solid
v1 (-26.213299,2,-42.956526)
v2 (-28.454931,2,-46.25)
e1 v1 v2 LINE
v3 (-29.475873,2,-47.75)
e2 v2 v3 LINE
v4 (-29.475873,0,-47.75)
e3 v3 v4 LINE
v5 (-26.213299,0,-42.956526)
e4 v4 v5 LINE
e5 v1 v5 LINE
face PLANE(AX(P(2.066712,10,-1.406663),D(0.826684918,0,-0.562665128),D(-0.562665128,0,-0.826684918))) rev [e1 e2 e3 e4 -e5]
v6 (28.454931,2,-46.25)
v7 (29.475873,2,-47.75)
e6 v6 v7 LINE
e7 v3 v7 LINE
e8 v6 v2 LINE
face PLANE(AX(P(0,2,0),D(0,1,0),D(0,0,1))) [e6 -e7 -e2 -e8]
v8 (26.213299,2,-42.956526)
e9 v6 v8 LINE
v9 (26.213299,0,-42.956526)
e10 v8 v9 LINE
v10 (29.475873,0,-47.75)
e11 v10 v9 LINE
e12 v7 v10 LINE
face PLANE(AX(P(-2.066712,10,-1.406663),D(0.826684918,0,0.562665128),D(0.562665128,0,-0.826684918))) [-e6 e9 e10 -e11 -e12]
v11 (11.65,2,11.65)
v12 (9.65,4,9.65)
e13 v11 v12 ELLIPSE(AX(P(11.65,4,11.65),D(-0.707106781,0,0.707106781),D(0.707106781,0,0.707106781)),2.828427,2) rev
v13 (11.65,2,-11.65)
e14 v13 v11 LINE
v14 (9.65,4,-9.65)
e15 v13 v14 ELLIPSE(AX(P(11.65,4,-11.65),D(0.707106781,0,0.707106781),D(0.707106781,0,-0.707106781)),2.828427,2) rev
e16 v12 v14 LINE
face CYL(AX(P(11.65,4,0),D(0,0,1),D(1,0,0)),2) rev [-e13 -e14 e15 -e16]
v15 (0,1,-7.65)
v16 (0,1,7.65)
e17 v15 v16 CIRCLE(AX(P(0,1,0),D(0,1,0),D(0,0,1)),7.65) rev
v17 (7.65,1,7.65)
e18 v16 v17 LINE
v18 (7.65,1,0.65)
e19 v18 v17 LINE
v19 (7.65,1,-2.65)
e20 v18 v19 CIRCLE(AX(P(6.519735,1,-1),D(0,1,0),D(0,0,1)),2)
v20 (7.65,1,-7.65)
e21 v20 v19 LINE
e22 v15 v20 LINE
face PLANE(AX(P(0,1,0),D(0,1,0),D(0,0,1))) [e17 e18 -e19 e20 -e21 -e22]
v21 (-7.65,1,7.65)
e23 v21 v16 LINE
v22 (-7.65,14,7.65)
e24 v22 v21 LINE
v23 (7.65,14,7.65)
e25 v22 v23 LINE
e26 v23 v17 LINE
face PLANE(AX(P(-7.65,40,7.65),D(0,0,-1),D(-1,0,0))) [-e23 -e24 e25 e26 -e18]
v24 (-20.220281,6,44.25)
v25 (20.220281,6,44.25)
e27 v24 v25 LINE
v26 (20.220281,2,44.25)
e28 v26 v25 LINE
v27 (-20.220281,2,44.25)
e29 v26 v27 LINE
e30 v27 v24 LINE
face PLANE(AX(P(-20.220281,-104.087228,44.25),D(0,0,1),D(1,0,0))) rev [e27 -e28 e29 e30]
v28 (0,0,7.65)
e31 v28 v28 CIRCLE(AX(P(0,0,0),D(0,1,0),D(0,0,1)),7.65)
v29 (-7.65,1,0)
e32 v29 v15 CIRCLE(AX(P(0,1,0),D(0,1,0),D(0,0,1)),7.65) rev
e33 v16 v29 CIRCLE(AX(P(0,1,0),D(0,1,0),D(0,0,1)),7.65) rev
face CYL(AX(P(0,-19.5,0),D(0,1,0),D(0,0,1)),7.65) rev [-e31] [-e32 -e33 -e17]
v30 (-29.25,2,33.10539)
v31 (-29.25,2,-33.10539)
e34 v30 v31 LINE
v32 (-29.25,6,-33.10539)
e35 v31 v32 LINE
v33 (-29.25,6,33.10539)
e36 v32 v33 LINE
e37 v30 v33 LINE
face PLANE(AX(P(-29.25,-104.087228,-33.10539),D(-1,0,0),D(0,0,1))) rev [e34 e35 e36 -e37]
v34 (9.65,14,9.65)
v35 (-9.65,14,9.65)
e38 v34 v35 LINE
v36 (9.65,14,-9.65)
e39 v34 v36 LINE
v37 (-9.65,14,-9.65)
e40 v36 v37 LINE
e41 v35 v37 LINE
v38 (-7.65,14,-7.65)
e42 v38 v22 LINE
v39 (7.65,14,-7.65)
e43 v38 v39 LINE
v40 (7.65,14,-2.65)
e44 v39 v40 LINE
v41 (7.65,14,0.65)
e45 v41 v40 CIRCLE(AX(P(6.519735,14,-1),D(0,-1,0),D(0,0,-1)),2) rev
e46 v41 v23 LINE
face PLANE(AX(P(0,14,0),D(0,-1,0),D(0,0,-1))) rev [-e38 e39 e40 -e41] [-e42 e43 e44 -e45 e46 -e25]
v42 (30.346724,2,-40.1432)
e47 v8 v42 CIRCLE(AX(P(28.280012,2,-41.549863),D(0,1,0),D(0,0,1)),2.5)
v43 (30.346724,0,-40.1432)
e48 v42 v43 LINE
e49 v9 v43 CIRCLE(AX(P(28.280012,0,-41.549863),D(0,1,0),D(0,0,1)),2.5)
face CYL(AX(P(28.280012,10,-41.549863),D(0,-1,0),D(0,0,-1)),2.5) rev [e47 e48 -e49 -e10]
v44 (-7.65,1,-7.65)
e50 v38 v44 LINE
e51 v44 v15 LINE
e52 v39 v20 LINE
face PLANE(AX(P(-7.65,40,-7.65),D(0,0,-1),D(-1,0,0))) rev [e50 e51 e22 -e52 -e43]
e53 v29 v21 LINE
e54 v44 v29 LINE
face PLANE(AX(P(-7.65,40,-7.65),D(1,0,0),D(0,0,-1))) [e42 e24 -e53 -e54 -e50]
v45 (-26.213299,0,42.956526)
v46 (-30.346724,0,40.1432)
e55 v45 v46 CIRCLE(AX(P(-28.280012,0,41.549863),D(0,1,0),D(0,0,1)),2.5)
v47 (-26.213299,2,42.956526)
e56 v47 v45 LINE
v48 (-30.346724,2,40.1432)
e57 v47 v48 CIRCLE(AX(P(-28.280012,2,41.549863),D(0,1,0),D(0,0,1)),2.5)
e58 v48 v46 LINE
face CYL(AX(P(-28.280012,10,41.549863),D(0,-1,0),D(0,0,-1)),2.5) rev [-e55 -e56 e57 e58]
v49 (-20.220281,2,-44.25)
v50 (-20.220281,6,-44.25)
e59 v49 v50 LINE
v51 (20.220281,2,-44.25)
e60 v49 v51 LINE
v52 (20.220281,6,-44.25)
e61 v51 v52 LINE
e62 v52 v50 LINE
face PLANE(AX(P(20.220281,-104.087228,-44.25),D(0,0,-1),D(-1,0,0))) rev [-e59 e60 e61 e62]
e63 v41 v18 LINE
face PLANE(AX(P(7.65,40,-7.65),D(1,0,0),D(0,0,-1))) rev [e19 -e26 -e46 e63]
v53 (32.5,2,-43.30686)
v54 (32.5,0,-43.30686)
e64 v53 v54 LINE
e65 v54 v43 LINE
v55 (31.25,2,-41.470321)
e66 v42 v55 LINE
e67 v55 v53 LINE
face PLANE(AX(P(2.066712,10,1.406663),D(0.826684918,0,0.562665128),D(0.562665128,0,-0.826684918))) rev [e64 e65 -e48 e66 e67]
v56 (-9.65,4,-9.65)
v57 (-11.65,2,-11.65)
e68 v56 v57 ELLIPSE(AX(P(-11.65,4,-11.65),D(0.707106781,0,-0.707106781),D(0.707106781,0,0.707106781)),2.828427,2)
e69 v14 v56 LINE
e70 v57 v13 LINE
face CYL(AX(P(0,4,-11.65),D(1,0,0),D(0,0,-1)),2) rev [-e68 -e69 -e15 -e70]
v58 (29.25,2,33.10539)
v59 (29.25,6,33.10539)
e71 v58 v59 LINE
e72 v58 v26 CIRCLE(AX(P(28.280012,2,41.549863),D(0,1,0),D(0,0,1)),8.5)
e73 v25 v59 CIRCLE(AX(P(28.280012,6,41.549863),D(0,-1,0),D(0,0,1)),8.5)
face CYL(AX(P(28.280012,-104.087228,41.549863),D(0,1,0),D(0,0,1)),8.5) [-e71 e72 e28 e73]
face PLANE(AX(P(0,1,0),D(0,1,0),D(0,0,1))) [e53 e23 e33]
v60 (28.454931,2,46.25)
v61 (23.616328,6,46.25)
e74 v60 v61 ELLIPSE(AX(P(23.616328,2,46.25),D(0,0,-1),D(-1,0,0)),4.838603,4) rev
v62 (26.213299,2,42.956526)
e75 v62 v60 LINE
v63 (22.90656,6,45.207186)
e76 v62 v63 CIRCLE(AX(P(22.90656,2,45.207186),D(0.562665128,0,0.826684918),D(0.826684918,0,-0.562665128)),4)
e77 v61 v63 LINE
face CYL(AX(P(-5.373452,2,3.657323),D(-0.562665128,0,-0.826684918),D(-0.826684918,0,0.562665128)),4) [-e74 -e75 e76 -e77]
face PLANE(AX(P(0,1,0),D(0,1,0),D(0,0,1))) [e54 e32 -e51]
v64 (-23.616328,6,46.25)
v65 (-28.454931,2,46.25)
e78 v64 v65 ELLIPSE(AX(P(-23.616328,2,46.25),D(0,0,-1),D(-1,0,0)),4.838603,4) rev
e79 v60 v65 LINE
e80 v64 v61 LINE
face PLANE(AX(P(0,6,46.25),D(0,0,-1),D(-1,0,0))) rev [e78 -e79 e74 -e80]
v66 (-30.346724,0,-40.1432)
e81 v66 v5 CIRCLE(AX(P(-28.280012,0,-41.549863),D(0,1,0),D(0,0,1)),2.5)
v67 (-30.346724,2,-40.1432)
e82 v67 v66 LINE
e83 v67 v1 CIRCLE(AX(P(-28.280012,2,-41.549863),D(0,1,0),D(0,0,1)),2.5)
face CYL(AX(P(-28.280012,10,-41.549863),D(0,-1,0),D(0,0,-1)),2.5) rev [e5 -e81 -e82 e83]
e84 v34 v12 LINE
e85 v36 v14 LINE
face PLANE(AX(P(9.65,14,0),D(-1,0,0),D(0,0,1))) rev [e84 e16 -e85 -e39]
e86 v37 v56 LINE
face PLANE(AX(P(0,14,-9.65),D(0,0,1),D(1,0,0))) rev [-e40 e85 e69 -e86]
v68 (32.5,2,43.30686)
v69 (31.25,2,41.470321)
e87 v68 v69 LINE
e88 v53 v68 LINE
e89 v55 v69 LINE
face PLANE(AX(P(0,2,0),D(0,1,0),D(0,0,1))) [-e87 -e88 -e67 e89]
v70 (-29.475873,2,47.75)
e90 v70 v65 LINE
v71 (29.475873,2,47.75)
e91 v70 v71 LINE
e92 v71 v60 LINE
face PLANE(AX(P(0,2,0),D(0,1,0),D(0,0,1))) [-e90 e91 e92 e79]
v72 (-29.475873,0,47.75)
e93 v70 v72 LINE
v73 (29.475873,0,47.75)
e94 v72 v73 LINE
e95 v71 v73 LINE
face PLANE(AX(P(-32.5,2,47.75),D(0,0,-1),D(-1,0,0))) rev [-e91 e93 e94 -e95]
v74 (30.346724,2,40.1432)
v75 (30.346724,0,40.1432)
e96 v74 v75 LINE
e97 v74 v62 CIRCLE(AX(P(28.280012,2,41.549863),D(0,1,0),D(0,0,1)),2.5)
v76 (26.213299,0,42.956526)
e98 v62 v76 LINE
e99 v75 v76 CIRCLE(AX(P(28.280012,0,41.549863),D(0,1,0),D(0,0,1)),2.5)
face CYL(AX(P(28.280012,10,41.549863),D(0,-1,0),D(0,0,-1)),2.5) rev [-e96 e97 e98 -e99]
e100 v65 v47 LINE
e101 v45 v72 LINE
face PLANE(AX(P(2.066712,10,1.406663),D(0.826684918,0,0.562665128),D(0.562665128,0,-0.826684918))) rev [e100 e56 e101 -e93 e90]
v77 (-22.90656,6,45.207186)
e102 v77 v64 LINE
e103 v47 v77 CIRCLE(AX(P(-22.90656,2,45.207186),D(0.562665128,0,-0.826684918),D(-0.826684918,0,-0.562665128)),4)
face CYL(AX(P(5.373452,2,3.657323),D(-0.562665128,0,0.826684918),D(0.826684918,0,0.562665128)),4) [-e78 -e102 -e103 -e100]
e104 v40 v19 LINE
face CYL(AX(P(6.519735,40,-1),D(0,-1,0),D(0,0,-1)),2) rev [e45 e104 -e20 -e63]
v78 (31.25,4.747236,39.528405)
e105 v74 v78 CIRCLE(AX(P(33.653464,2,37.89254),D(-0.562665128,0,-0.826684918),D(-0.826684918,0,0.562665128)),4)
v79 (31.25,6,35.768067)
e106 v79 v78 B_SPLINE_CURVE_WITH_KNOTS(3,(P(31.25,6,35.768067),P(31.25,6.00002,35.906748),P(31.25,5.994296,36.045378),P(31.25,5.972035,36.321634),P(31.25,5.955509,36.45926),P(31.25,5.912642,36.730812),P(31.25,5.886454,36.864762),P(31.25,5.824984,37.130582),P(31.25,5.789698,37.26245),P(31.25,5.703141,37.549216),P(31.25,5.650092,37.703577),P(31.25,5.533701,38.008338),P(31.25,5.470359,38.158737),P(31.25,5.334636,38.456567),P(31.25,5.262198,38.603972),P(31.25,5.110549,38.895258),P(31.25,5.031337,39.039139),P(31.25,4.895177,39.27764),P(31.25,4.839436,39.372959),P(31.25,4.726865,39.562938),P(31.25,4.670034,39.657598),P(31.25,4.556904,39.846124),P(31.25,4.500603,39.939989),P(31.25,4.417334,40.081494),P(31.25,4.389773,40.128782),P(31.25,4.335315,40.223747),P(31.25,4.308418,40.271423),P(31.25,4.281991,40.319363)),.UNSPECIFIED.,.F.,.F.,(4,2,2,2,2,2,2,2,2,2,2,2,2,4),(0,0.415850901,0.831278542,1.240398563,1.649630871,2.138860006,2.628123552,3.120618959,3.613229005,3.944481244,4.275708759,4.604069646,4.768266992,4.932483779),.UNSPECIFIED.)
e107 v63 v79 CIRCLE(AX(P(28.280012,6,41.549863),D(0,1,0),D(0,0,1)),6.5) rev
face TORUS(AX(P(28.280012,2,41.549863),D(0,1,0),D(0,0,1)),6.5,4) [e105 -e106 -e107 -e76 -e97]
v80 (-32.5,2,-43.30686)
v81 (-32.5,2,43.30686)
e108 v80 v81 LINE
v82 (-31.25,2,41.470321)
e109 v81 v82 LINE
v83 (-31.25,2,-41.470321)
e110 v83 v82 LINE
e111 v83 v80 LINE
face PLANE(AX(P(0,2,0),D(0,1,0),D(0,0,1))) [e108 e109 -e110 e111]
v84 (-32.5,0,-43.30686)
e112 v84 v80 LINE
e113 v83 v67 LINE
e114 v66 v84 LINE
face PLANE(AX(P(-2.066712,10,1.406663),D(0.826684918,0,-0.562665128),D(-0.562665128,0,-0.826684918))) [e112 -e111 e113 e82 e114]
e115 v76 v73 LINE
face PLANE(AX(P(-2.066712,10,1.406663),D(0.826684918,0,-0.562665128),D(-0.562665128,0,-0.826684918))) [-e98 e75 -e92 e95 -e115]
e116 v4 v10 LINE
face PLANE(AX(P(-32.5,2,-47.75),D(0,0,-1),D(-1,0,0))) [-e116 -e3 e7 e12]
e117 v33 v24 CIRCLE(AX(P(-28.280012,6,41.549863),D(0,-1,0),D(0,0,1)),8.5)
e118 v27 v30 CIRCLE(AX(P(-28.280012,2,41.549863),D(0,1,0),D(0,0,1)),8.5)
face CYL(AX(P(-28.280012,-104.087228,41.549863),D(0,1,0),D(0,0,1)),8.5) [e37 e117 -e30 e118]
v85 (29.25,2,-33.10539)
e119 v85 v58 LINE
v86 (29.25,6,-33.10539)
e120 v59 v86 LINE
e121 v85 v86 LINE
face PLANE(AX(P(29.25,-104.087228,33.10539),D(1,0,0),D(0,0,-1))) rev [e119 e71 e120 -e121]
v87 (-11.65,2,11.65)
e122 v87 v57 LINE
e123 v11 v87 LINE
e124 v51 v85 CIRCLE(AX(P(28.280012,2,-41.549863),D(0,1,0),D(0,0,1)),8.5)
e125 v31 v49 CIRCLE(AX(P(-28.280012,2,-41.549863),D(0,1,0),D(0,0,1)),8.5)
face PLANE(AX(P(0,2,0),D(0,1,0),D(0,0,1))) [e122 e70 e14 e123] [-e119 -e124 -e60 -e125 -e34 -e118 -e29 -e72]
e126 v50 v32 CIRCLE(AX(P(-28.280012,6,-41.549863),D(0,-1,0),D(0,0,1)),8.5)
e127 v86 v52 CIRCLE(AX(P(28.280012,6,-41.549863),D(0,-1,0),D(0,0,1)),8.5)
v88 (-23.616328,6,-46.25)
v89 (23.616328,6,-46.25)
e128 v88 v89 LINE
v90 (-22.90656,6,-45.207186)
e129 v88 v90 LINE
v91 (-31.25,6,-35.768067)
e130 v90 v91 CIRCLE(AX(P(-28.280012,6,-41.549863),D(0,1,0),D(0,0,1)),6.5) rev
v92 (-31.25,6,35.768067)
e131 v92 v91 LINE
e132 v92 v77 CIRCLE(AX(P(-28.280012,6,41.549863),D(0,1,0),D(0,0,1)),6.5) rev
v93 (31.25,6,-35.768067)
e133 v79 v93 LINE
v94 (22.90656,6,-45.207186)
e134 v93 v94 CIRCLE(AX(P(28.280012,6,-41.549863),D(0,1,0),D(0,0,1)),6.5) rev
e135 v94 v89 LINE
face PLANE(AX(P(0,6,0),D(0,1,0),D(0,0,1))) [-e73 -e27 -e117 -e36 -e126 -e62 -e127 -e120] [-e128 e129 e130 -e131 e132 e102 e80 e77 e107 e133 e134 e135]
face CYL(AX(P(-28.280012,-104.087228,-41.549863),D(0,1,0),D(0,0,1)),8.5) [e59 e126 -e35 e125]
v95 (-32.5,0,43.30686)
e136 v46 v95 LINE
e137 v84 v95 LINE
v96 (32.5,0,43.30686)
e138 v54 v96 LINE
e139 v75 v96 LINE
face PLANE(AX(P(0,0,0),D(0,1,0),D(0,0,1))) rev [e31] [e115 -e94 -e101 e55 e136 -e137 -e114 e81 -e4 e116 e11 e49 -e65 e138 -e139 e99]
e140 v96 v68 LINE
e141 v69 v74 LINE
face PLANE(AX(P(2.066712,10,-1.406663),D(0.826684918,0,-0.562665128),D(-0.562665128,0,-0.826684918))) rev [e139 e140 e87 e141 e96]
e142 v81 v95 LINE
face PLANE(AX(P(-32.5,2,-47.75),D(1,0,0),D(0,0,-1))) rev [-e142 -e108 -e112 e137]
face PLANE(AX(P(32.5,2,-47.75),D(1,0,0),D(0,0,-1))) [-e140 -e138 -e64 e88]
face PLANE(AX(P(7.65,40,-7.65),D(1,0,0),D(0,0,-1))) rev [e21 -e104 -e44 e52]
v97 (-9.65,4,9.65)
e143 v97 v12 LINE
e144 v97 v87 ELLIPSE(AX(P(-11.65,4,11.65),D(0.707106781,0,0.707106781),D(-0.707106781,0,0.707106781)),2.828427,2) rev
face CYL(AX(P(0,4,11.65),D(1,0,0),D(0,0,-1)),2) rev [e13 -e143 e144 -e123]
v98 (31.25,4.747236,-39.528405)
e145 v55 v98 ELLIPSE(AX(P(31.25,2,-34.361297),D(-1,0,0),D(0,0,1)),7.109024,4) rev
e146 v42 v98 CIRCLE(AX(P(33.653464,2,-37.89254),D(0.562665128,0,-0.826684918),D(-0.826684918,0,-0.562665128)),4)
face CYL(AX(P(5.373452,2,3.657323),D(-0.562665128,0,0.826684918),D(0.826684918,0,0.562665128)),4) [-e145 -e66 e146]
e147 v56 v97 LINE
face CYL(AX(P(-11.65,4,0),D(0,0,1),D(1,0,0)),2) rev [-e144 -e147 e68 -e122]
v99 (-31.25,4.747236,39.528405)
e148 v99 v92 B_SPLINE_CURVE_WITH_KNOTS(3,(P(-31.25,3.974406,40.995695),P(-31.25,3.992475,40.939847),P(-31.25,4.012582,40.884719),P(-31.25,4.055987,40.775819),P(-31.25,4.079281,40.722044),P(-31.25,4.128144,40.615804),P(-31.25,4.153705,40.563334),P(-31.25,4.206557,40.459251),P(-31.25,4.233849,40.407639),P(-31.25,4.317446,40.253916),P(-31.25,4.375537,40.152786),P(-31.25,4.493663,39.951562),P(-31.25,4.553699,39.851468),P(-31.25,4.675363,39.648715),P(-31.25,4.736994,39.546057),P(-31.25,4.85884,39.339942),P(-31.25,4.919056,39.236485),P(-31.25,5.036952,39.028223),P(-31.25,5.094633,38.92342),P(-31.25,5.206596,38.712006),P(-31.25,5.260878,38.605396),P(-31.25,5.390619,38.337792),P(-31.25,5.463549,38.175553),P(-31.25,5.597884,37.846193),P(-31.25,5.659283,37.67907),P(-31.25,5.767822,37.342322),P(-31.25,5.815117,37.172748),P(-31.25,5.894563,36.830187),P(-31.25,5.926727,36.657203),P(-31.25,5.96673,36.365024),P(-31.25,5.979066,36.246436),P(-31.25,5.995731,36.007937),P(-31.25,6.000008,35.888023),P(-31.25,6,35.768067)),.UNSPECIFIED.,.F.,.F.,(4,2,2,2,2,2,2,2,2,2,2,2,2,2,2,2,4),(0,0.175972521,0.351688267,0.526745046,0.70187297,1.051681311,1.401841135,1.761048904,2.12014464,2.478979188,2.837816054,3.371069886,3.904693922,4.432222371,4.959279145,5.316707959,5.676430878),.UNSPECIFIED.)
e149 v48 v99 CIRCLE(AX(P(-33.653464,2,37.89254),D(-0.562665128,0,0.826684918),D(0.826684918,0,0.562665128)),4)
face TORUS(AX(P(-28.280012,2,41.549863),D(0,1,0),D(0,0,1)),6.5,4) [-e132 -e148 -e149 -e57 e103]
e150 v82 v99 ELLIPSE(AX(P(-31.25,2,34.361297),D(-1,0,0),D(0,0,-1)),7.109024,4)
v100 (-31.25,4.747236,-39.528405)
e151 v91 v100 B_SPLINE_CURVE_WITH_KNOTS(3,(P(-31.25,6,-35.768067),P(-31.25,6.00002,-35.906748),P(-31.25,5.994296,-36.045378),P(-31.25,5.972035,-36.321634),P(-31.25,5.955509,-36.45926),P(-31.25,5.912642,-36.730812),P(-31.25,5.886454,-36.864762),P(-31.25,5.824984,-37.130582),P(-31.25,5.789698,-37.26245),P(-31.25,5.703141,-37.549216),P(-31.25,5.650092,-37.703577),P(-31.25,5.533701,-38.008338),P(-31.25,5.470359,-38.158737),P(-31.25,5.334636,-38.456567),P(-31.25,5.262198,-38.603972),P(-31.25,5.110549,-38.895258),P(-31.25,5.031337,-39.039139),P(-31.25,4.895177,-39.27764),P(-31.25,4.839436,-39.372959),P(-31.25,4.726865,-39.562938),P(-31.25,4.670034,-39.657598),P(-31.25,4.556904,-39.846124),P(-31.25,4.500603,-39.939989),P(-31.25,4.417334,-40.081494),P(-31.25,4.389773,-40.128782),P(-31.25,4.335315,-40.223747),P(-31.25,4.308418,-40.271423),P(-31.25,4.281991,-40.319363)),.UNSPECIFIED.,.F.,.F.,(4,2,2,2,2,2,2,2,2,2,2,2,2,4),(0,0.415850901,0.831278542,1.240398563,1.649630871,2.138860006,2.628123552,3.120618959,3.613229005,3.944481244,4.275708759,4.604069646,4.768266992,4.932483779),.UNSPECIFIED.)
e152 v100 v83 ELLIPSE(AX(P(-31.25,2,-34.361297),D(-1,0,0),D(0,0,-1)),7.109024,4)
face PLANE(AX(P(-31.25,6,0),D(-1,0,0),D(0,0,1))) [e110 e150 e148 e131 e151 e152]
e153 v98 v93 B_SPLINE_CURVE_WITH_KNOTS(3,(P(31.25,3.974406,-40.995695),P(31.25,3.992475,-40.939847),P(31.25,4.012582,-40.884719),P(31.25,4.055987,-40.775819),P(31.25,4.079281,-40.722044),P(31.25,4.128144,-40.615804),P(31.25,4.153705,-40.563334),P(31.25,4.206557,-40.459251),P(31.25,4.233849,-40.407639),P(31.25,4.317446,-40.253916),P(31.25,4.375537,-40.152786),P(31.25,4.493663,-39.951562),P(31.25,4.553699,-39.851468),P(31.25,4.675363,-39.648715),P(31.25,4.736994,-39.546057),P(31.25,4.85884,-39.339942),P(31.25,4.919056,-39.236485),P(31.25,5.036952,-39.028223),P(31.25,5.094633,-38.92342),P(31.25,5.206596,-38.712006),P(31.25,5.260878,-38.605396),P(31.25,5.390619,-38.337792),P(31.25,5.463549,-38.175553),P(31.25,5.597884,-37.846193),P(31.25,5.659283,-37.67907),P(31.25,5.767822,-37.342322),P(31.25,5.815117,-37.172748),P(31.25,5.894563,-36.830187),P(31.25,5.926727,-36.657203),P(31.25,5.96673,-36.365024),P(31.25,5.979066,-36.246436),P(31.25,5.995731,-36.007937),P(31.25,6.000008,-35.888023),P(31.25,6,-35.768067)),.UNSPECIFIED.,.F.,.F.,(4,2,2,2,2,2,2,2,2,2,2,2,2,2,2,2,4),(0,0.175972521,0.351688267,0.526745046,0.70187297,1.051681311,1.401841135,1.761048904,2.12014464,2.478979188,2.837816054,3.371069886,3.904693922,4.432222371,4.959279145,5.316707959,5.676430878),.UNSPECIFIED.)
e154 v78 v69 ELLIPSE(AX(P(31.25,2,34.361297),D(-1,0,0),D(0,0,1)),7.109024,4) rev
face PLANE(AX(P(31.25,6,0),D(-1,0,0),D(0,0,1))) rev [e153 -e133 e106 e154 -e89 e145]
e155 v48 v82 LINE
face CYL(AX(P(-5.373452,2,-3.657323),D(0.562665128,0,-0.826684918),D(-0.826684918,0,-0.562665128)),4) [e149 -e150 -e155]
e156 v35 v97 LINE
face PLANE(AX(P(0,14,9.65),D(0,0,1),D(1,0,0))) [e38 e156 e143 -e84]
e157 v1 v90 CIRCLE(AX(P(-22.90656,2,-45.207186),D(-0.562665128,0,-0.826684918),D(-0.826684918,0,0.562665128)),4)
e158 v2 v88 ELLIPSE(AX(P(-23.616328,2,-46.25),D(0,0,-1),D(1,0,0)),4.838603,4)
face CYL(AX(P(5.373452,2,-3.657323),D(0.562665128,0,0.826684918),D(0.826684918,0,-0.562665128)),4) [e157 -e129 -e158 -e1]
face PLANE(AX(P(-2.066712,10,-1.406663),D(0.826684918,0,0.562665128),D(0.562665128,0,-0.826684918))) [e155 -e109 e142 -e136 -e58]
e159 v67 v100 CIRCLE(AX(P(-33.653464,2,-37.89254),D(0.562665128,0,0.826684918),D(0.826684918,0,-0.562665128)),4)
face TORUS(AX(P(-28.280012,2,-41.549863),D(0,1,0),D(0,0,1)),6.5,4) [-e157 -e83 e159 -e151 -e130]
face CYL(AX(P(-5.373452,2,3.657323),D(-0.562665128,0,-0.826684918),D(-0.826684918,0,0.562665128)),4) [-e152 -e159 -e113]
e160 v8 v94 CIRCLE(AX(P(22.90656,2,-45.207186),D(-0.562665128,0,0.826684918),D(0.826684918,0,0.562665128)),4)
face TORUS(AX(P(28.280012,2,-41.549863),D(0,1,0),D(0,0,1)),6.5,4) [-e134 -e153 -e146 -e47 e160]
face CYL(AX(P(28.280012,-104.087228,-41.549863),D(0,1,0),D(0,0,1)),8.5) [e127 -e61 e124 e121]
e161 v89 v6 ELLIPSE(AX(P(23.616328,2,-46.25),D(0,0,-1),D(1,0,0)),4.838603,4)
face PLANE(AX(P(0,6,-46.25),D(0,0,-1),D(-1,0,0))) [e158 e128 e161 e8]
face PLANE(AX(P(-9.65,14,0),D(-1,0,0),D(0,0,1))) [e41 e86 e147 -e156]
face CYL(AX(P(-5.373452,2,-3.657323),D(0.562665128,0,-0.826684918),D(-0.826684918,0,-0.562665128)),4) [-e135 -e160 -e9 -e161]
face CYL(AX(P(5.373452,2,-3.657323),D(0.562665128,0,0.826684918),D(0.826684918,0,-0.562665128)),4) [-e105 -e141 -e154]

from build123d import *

# Parameters (mm, degrees)
SKETCH1_W           = 65
SKETCH1_H           = 95.5
BOSS_EXTRUDE1_DEPTH = 2
SKETCH1_3_W         = 62.5
SKETCH1_3_H         = 92.5
BOSS_EXTRUDE2_DEPTH = 6
BOSS_EXTRUDE3_START = 6
SKETCH2_4_W         = 19.3
SKETCH2_4_H         = 19.3
BOSS_EXTRUDE3_DEPTH = 8
SKETCH2_R           = 7.65
CUT_EXTRUDE1_DEPTH  = 19.5
CUT_EXTRUDE2_START  = 40
CUT_EXTRUDE2_DEPTH  = 39
CUT_EXTRUDE3_DEPTH  = 10
FILLET1_R           = 4
SKETCH5_W           = 19.3
SKETCH5_H           = 19.3
CUT_EXTRUDE5_DEPTH  = 4
FILLET2_R           = 2


with BuildPart() as part:
    # Sketch1 → Boss-Extrude1 (new body)
    with BuildSketch(Plane(origin=(0, 0, 0), x_dir=(1, 0, 0), z_dir=(0, 1, 0))):
        Rectangle(SKETCH1_W, SKETCH1_H)
    extrude(amount=BOSS_EXTRUDE1_DEPTH)

    # Sketch1<3> → Boss-Extrude2 (add)
    with BuildSketch(Plane(origin=(0, 0, 0), x_dir=(1, 0, 0), z_dir=(0, 1, 0))):
        Rectangle(SKETCH1_3_W, SKETCH1_3_H)
    extrude(amount=BOSS_EXTRUDE2_DEPTH)

    # Sketch2<4> → Boss-Extrude3 (add)
    with BuildSketch(Plane(origin=(0, 0, 0), x_dir=(1, 0, 0), z_dir=(0, 1, 0)).offset(BOSS_EXTRUDE3_START)):
        Rectangle(SKETCH2_4_W, SKETCH2_4_H)
    extrude(amount=BOSS_EXTRUDE3_DEPTH)

    # Sketch2 → Cut-Extrude1 (cut, symmetric)
    with BuildSketch(Plane(origin=(0, 0, 0), x_dir=(1, 0, 0), z_dir=(0, 1, 0))):
        with Locations(Location((0, 0, 0), (0, 0, 270))):
            Circle(SKETCH2_R)
    extrude(amount=CUT_EXTRUDE1_DEPTH, both=True, mode=Mode.SUBTRACT)

    # Sketch2<3> → Cut-Extrude2 (cut)
    with BuildSketch(Plane(origin=(0, 0, 0), x_dir=(1, 0, 0), z_dir=(0, 1, 0)).offset(CUT_EXTRUDE2_START)):
        with BuildLine():
            Line((9e-09, 7.65), (-7.65, 7.65))
            Line((-7.65, 7.65), (-7.65, 0))
            ThreePointArc((-7.65, 0), (-5.409366873, 5.409366879), (9e-09, 7.65))
        make_face()
        with BuildLine():
            Line((7.65, 7.65), (9e-09, 7.65))
            ThreePointArc((9e-09, 7.65), (7.65, 0), (9e-09, -7.65))
            Line((9e-09, -7.65), (7.65, -7.65))
            Line((7.65, -7.65), (7.65, -0.65))
            ThreePointArc((7.65, -0.65), (8.519734544, 1), (7.65, 2.65))
            Line((7.65, 2.65), (7.65, 7.65))
        make_face()
        with BuildLine():
            ThreePointArc((9e-09, -7.65), (-5.409366873, -5.409366879), (-7.65, 0))
            Line((-7.65, 0), (-7.65, -7.65))
            Line((-7.65, -7.65), (9e-09, -7.65))
        make_face()
    extrude(amount=-CUT_EXTRUDE2_DEPTH, mode=Mode.SUBTRACT)

    # Sketch3 → Cut-Extrude3 (cut)
    with BuildSketch(Plane(origin=(0, 0, 0), x_dir=(1, 0, 0), z_dir=(0, 1, 0))):
        with BuildLine():
            Line((-30.433287704, 49.156662819), (-34.566712296, 46.343337181))
            Line((-34.566712296, 46.343337181), (-30.346723838, 40.143200294))
            ThreePointArc((-30.346723838, 40.143200294), (-26.873348724, 39.483150817), (-26.213299247, 42.956525932))
            Line((-26.213299247, 42.956525932), (-30.433287704, 49.156662819))
        make_face()
        with BuildLine():
            Line((34.566712296, 46.343337181), (30.433287704, 49.156662819))
            Line((30.433287704, 49.156662819), (26.213299247, 42.956525932))
            ThreePointArc((26.213299247, 42.956525932), (26.873348724, 39.483150817), (30.346723838, 40.143200294))
            Line((30.346723838, 40.143200294), (34.566712296, 46.343337181))
        make_face()
        with BuildLine():
            Line((-30.346723838, -40.143200294), (-34.566712296, -46.343337181))
            Line((-34.566712296, -46.343337181), (-30.433287704, -49.156662819))
            Line((-30.433287704, -49.156662819), (-26.213299247, -42.956525932))
            ThreePointArc((-26.213299247, -42.956525932), (-26.873348724, -39.483150817), (-30.346723838, -40.143200294))
        make_face()
        with BuildLine():
            Line((26.213299247, -42.956525932), (30.433287704, -49.156662819))
            Line((30.433287704, -49.156662819), (34.566712296, -46.343337181))
            Line((34.566712296, -46.343337181), (30.346723838, -40.143200294))
            ThreePointArc((30.346723838, -40.143200294), (26.873348724, -39.483150817), (26.213299247, -42.956525932))
        make_face()
    extrude(amount=CUT_EXTRUDE3_DEPTH, mode=Mode.SUBTRACT)

    # Fillet1
    # the kernel refuses this fillet: 4 mm, written as the material it takes off along each edge
    with BuildSketch(Plane(origin=(-36.876651276, 6, 49.737170606), x_dir=(0, -1, 0), z_dir=(0.5626651276372232, 0, -0.826684918297768)), Plane(origin=(30.346723838, 6, 40.143200294), x_dir=(0, -1, 0), z_dir=(0.5626651276372238, 0, 0.8266849182977677)), Plane(origin=(36.876651276, 6, -49.737170606), x_dir=(0, -1, 0), z_dir=(-0.562665127637224, 0, 0.8266849182977676)), Plane(origin=(-30.346723838, 6, -40.143200294), x_dir=(0, -1, 0), z_dir=(-0.5626651276372242, 0, -0.8266849182977674))) as fillet1_piece_1:
        with BuildLine():
            CenterArc((FILLET1_R, FILLET1_R), FILLET1_R, 180, 90)
            Line((0, FILLET1_R), (0, 0))
            Line((0, 0), (FILLET1_R, 0))
        make_face()
    extrude(amount=11.605353019, mode=Mode.SUBTRACT)
    with BuildSketch(Plane(origin=(-26.213299247, 6, 42.956525932), x_dir=(0, -1, 0), z_dir=(-0.5626651276372243, 0, 0.8266849182977672)), Plane(origin=(34.081582088, 6, 54.516849183), x_dir=(0, -1, 0), z_dir=(-0.5626651276372246, 0, -0.826684918297767)), Plane(origin=(26.213299247, 6, -42.956525932), x_dir=(0, -1, 0), z_dir=(0.5626651276372232, 0, -0.826684918297768)), Plane(origin=(-34.081582088, 6, -54.516849183), x_dir=(0, -1, 0), z_dir=(0.562665127637224, 0, 0.8266849182977676))) as fillet1_piece_2:
        with BuildLine():
            CenterArc((FILLET1_R, FILLET1_R), FILLET1_R, 180, 90)
            Line((0, FILLET1_R), (0, 0))
            Line((0, 0), (FILLET1_R, 0))
        make_face()
    extrude(amount=13.983953251, mode=Mode.SUBTRACT)
    with BuildSketch(Plane(origin=(-28.280011543, 6, 41.549863113), x_dir=(-0.8266849182977704, 0, -0.5626651276372198), z_dir=(-0.5626651276372198, 0, 0.8266849182977704))) as fillet1_piece_3:
        with BuildLine():
            CenterArc((2.5 + FILLET1_R, FILLET1_R), FILLET1_R, 180, 90)
            Line((2.5 + FILLET1_R, 0), (2.5, 0))
            Line((2.5, 0), (2.5, FILLET1_R))
        make_face()
    revolve(axis=Axis((-28.280011543, 6, 41.549863113), (0, -1, 0)), revolution_arc=180, mode=Mode.SUBTRACT)
    with BuildSketch(Plane(origin=(28.280011543, 6, 41.549863113), x_dir=(-0.8266849182977659, 0, 0.5626651276372262), z_dir=(0.5626651276372262, 0, 0.8266849182977659))) as fillet1_piece_4:
        with BuildLine():
            CenterArc((2.5 + FILLET1_R, FILLET1_R), FILLET1_R, 180, 90)
            Line((2.5 + FILLET1_R, 0), (2.5, 0))
            Line((2.5, 0), (2.5, FILLET1_R))
        make_face()
    revolve(axis=Axis((28.280011543, 6, 41.549863113), (0, -1, 0)), revolution_arc=180, mode=Mode.SUBTRACT)
    with BuildSketch(Plane(origin=(28.280011543, 6, -41.549863113), x_dir=(0.826684918297769, 0, 0.5626651276372218), z_dir=(0.5626651276372218, 0, -0.826684918297769))) as fillet1_piece_5:
        with BuildLine():
            CenterArc((2.5 + FILLET1_R, FILLET1_R), FILLET1_R, 180, 90)
            Line((2.5 + FILLET1_R, 0), (2.5, 0))
            Line((2.5, 0), (2.5, FILLET1_R))
        make_face()
    revolve(axis=Axis((28.280011543, 6, -41.549863113), (0, -1, 0)), revolution_arc=180, mode=Mode.SUBTRACT)
    with BuildSketch(Plane(origin=(-28.280011543, 6, -41.549863113), x_dir=(0.8266849182977655, 0, -0.562665127637227), z_dir=(-0.562665127637227, 0, -0.8266849182977655))) as fillet1_piece_6:
        with BuildLine():
            CenterArc((2.5 + FILLET1_R, FILLET1_R), FILLET1_R, 180, 90)
            Line((2.5 + FILLET1_R, 0), (2.5, 0))
            Line((2.5, 0), (2.5, FILLET1_R))
        make_face()
    revolve(axis=Axis((-28.280011543, 6, -41.549863113), (0, -1, 0)), revolution_arc=180, mode=Mode.SUBTRACT)

    # Sketch5 → Cut-Extrude5 (cut)
    with BuildSketch(Plane(origin=(0, 6, 0), x_dir=(1, 0, 0), z_dir=(0, 1, 0))):
        with BuildLine():
            Line((-20.220280729, -44.25), (20.220280729, -44.25))
            ThreePointArc((20.220280729, -44.25), (21.675717981, -36.198853249), (29.25, -33.105390223))
            Line((29.25, -33.105390223), (29.25, 33.105390223))
            ThreePointArc((29.25, 33.105390223), (21.675717981, 36.198853249), (20.220280729, 44.25))
            Line((20.220280729, 44.25), (-20.220280729, 44.25))
            ThreePointArc((-20.220280729, 44.25), (-21.675717981, 36.198853249), (-29.25, 33.105390223))
            Line((-29.25, 33.105390223), (-29.25, -33.105390223))
            ThreePointArc((-29.25, -33.105390223), (-21.675717981, -36.198853249), (-20.220280729, -44.25))
        make_face()
        Rectangle(SKETCH5_W, SKETCH5_H, mode=Mode.SUBTRACT)
    extrude(amount=-CUT_EXTRUDE5_DEPTH, mode=Mode.SUBTRACT)

    # Fillet2
    fillet2_edges = [part.edges().sort_by_distance(p)[0] for p in [
        (0, 2, -9.65),
        (-9.65, 2, 0),
        (0, 2, 9.65),
        (9.65, 2, 0),
    ]]
    fillet(fillet2_edges, radius=FILLET2_R)


solid = part.part
